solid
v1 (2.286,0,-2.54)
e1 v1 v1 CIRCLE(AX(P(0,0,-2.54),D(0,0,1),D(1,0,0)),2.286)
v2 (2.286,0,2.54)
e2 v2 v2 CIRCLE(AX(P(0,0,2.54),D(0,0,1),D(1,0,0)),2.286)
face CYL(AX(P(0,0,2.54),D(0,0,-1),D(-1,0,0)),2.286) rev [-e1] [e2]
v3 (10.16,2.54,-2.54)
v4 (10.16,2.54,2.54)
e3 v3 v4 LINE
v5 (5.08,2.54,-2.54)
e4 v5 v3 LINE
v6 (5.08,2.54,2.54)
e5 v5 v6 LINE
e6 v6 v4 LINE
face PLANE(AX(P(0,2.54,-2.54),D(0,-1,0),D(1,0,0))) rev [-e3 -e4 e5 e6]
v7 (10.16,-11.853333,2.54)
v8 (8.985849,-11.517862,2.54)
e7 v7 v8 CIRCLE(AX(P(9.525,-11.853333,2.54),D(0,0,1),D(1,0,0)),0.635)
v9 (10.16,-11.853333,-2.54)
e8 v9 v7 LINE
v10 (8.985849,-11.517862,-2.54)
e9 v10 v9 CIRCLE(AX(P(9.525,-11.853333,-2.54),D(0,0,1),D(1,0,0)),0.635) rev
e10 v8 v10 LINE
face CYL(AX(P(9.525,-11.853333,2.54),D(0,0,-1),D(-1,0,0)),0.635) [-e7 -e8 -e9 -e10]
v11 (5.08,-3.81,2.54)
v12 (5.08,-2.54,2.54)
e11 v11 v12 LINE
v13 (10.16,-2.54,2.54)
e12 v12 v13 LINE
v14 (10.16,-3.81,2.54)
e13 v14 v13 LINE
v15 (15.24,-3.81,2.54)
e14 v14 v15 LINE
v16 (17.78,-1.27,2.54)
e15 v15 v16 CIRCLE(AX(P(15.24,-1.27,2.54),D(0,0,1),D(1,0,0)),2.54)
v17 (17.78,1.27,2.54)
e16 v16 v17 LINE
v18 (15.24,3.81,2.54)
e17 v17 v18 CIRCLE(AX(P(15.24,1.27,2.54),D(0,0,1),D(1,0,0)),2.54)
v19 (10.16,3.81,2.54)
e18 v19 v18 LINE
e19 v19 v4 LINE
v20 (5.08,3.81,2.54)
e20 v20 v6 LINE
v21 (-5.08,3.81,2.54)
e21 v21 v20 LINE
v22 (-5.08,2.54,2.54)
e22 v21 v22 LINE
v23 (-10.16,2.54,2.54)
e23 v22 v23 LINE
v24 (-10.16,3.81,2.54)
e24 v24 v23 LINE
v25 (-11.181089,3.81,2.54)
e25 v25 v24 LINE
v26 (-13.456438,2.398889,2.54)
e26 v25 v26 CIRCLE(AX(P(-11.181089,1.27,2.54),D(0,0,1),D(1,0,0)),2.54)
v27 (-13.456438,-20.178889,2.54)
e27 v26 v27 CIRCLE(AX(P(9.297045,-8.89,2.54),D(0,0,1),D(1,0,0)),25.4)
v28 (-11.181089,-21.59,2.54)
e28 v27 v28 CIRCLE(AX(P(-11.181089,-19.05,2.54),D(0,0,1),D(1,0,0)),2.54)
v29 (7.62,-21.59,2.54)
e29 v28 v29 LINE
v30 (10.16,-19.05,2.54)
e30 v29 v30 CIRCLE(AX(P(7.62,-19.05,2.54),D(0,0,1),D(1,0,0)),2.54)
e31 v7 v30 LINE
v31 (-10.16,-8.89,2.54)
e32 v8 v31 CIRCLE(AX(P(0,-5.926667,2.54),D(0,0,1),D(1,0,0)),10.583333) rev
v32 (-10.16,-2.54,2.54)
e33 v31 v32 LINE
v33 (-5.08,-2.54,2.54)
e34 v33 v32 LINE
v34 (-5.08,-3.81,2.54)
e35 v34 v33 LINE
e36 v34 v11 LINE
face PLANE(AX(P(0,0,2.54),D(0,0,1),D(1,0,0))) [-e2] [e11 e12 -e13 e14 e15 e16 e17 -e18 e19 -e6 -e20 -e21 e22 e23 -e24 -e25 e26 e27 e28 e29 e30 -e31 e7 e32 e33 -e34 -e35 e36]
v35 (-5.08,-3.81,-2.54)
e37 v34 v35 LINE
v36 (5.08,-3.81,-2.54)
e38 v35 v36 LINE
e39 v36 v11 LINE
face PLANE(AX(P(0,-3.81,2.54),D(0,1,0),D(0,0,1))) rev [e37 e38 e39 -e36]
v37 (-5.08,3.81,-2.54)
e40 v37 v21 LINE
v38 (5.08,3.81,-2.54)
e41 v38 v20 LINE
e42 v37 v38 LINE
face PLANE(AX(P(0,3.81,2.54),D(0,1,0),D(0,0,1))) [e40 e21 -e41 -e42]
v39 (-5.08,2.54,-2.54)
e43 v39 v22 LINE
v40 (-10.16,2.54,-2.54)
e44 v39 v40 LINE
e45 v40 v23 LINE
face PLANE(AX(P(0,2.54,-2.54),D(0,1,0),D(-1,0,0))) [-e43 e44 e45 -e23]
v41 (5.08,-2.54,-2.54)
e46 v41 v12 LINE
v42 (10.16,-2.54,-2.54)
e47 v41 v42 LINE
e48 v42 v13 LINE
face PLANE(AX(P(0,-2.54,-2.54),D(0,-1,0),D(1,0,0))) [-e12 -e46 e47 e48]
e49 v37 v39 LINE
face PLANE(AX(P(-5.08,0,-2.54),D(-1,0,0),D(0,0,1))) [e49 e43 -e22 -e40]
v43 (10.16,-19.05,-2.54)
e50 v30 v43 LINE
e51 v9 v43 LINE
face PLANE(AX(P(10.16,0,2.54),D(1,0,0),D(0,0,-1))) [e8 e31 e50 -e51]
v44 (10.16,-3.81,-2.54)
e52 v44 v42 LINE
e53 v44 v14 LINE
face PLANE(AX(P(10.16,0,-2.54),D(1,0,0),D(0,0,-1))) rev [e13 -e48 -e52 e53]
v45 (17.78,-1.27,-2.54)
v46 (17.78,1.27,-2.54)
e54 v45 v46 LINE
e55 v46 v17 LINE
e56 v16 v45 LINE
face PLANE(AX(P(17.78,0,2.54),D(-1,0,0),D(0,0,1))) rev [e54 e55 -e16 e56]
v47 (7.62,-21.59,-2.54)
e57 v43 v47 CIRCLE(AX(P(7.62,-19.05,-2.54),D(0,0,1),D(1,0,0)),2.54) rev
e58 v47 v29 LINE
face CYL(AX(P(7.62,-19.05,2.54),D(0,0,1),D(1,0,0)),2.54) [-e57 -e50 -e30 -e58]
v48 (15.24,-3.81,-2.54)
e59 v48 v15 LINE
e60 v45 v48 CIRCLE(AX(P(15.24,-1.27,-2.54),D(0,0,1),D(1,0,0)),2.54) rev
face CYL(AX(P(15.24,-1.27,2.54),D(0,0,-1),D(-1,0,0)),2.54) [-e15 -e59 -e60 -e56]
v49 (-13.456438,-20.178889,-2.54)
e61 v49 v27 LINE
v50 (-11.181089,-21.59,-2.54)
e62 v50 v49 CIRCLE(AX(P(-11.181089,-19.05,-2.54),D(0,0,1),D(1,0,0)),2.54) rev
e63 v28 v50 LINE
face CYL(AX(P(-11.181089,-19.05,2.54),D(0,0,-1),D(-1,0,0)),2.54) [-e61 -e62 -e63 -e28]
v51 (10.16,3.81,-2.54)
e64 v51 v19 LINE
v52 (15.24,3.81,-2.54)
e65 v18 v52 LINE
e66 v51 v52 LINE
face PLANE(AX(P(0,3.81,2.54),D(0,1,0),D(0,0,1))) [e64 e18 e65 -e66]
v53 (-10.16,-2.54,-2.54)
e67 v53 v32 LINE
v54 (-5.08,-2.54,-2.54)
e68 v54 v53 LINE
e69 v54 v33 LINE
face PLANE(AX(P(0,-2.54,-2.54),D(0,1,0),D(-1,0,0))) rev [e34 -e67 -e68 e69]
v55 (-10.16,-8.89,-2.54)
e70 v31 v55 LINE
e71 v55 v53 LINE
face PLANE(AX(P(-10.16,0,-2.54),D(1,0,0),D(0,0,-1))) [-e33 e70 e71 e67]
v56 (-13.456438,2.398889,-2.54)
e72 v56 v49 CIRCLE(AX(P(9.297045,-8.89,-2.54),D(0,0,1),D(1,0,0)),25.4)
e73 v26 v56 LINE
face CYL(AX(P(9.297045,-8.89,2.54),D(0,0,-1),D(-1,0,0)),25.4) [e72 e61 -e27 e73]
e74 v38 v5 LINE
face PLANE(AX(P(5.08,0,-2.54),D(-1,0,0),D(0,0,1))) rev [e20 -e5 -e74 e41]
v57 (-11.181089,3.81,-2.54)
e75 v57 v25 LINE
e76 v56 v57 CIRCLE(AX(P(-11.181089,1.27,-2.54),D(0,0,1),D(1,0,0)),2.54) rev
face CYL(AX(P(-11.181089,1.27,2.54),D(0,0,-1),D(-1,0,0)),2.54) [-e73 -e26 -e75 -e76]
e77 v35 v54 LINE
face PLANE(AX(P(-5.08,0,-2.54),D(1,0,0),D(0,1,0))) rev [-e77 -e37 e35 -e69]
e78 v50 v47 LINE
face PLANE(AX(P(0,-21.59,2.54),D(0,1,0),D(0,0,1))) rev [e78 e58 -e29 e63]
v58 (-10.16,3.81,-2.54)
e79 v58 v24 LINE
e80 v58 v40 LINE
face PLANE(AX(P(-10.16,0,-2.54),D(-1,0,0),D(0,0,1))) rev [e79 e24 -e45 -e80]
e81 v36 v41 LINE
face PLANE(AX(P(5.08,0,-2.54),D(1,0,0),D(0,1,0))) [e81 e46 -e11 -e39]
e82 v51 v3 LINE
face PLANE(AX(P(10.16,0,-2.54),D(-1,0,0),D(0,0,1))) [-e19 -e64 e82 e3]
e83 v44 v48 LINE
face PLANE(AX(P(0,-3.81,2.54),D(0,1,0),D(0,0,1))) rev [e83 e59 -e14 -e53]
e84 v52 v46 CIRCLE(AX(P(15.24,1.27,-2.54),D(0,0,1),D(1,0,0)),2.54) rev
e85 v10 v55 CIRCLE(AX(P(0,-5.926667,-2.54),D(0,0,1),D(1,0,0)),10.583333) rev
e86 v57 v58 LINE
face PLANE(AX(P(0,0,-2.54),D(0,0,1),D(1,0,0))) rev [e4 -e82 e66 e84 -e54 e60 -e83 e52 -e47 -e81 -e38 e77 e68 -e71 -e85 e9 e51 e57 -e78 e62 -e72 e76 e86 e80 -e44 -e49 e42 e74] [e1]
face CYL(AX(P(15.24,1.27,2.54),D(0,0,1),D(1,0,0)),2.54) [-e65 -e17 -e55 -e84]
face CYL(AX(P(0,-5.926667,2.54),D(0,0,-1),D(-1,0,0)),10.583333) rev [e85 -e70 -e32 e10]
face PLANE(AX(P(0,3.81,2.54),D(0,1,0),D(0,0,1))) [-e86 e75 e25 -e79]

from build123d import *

# Parameters (mm, degrees)
SKETCH1_W              = 30.48
SKETCH1_H              = 7.62
SKETCH1_R              = 2.286
BOSS_EXTRUDE1_DEPTH    = 2.54
FILLET1_R              = 2.54
FILLET2_R              = 5.08
CUT_EXTRUDE1_START     = -5.08
CUT_EXTRUDE1_OUTLINE_W = 5.08
CUT_EXTRUDE1_OUTLINE_H = 1.27
CUT_EXTRUDE1_DEPTH     = 5.08
FILLET3_R              = 0.635


# Read off the part's stored shape, not the designer's step: Cut-Extrude1
with BuildPart() as part:
    # Sketch1 → Boss-Extrude1 (new, symmetric)
    # profile 1 of 7: a face of its own
    with BuildSketch(Plane.XY):
        with Locations((2.54, 0)):
            Rectangle(SKETCH1_W, SKETCH1_H)
        Circle(SKETCH1_R, mode=Mode.SUBTRACT)
    # profile 2 of 7: a face of its own
    with BuildSketch(Plane.XY):
        with BuildLine():
            Line((-12.7, -16.51), (-12.7, -3.81))
            Line((-12.7, -3.81), (-12.7, 3.81))
            ThreePointArc((-12.7, 3.81), (-16.102954744, -8.89), (-12.7, -21.59))
            Line((-12.7, -21.59), (-12.7, -16.51))
        make_face()
    # profile 3 of 7: a face of its own
    with BuildSketch(Plane.XY):
        Polygon((-10.16, -3.81), (-12.7, -3.81), (-12.7, -16.51), (-10.16, -16.51), (-10.16, -8.89), align=None)
    # profile 4 of 7: a face of its own
    with BuildSketch(Plane.XY):
        Polygon((-10.16, -16.51), (-12.7, -16.51), (-12.7, -21.59), (10.16, -21.59), (10.16, -16.51), (9e-09, -16.51), align=None)
    # profile 5 of 7: a face of its own
    with BuildSketch(Plane.XY):
        with BuildLine():
            ThreePointArc((9e-09, -16.51), (-6.349999997, -14.393333336), (-10.16, -8.89))
            Line((-10.16, -8.89), (-10.16, -16.51))
            Line((-10.16, -16.51), (9e-09, -16.51))
        make_face()
    # profile 6 of 7: a face of its own
    with BuildSketch(Plane.XY):
        with BuildLine():
            ThreePointArc((10.16, -8.89), (6.350000003, -14.393333331), (9e-09, -16.51))
            Line((9e-09, -16.51), (10.16, -16.51))
            Line((10.16, -16.51), (10.16, -8.89))
        make_face()
    # profile 7 of 7: a face of its own
    with BuildSketch(Plane.XY):
        with BuildLine():
            ThreePointArc((10.16, -8.89), (6.350000003, -14.393333331), (9e-09, -16.51))
            Line((9e-09, -16.51), (10.16, -16.51))
            Line((10.16, -16.51), (10.16, -8.89))
        make_face()
    extrude(amount=BOSS_EXTRUDE1_DEPTH, both=True)

    # Fillet1
    fillet1_edges = [part.edges().sort_by_distance(p)[0] for p in [
        (10.16, -21.59, 0),
        (-12.7, -21.59, 0),
        (-12.7, 3.81, 0),
        (17.78, 3.81, 0),
        (17.78, -3.81, 0),
    ]]
    fillet(fillet1_edges, radius=FILLET1_R)

    # Fillet2
    fillet2_edges = [part.edges().sort_by_distance(p)[0] for p in [
        (-10.16, -3.81, 0),
    ]]
    fillet(fillet2_edges, radius=FILLET2_R - 0.0001)  # a hair under: the kernel refuses the full size

    # Cut-Extrude1 outline → Cut-Extrude1 (cut)
    with BuildSketch(Plane.XY.offset(2.54).offset(CUT_EXTRUDE1_START)):
        with BuildLine():
            ThreePointArc((-10.16, -8.89), (-8.672102448, -5.297897552), (-5.08, -3.81))
            Line((-5.08, -3.81), (-5.08, -2.54))
            Line((-5.08, -2.54), (-10.16, -2.54))
            Line((-10.16, -2.54), (-10.16, -8.89))
        make_face()
        with Locations((7.62, -3.175)):
            Rectangle(CUT_EXTRUDE1_OUTLINE_W, CUT_EXTRUDE1_OUTLINE_H)
        with Locations((7.62, 3.175)):
            Rectangle(CUT_EXTRUDE1_OUTLINE_W, CUT_EXTRUDE1_OUTLINE_H)
        with Locations((-7.62, 3.175)):
            Rectangle(CUT_EXTRUDE1_OUTLINE_W, CUT_EXTRUDE1_OUTLINE_H)
    extrude(amount=CUT_EXTRUDE1_DEPTH, mode=Mode.SUBTRACT)

    # Fillet3
    fillet3_edges = [part.edges().sort_by_distance(p)[0] for p in [
        (10.16, -8.89, 0),
    ]]
    fillet(fillet3_edges, radius=FILLET3_R)


solid = part.part
